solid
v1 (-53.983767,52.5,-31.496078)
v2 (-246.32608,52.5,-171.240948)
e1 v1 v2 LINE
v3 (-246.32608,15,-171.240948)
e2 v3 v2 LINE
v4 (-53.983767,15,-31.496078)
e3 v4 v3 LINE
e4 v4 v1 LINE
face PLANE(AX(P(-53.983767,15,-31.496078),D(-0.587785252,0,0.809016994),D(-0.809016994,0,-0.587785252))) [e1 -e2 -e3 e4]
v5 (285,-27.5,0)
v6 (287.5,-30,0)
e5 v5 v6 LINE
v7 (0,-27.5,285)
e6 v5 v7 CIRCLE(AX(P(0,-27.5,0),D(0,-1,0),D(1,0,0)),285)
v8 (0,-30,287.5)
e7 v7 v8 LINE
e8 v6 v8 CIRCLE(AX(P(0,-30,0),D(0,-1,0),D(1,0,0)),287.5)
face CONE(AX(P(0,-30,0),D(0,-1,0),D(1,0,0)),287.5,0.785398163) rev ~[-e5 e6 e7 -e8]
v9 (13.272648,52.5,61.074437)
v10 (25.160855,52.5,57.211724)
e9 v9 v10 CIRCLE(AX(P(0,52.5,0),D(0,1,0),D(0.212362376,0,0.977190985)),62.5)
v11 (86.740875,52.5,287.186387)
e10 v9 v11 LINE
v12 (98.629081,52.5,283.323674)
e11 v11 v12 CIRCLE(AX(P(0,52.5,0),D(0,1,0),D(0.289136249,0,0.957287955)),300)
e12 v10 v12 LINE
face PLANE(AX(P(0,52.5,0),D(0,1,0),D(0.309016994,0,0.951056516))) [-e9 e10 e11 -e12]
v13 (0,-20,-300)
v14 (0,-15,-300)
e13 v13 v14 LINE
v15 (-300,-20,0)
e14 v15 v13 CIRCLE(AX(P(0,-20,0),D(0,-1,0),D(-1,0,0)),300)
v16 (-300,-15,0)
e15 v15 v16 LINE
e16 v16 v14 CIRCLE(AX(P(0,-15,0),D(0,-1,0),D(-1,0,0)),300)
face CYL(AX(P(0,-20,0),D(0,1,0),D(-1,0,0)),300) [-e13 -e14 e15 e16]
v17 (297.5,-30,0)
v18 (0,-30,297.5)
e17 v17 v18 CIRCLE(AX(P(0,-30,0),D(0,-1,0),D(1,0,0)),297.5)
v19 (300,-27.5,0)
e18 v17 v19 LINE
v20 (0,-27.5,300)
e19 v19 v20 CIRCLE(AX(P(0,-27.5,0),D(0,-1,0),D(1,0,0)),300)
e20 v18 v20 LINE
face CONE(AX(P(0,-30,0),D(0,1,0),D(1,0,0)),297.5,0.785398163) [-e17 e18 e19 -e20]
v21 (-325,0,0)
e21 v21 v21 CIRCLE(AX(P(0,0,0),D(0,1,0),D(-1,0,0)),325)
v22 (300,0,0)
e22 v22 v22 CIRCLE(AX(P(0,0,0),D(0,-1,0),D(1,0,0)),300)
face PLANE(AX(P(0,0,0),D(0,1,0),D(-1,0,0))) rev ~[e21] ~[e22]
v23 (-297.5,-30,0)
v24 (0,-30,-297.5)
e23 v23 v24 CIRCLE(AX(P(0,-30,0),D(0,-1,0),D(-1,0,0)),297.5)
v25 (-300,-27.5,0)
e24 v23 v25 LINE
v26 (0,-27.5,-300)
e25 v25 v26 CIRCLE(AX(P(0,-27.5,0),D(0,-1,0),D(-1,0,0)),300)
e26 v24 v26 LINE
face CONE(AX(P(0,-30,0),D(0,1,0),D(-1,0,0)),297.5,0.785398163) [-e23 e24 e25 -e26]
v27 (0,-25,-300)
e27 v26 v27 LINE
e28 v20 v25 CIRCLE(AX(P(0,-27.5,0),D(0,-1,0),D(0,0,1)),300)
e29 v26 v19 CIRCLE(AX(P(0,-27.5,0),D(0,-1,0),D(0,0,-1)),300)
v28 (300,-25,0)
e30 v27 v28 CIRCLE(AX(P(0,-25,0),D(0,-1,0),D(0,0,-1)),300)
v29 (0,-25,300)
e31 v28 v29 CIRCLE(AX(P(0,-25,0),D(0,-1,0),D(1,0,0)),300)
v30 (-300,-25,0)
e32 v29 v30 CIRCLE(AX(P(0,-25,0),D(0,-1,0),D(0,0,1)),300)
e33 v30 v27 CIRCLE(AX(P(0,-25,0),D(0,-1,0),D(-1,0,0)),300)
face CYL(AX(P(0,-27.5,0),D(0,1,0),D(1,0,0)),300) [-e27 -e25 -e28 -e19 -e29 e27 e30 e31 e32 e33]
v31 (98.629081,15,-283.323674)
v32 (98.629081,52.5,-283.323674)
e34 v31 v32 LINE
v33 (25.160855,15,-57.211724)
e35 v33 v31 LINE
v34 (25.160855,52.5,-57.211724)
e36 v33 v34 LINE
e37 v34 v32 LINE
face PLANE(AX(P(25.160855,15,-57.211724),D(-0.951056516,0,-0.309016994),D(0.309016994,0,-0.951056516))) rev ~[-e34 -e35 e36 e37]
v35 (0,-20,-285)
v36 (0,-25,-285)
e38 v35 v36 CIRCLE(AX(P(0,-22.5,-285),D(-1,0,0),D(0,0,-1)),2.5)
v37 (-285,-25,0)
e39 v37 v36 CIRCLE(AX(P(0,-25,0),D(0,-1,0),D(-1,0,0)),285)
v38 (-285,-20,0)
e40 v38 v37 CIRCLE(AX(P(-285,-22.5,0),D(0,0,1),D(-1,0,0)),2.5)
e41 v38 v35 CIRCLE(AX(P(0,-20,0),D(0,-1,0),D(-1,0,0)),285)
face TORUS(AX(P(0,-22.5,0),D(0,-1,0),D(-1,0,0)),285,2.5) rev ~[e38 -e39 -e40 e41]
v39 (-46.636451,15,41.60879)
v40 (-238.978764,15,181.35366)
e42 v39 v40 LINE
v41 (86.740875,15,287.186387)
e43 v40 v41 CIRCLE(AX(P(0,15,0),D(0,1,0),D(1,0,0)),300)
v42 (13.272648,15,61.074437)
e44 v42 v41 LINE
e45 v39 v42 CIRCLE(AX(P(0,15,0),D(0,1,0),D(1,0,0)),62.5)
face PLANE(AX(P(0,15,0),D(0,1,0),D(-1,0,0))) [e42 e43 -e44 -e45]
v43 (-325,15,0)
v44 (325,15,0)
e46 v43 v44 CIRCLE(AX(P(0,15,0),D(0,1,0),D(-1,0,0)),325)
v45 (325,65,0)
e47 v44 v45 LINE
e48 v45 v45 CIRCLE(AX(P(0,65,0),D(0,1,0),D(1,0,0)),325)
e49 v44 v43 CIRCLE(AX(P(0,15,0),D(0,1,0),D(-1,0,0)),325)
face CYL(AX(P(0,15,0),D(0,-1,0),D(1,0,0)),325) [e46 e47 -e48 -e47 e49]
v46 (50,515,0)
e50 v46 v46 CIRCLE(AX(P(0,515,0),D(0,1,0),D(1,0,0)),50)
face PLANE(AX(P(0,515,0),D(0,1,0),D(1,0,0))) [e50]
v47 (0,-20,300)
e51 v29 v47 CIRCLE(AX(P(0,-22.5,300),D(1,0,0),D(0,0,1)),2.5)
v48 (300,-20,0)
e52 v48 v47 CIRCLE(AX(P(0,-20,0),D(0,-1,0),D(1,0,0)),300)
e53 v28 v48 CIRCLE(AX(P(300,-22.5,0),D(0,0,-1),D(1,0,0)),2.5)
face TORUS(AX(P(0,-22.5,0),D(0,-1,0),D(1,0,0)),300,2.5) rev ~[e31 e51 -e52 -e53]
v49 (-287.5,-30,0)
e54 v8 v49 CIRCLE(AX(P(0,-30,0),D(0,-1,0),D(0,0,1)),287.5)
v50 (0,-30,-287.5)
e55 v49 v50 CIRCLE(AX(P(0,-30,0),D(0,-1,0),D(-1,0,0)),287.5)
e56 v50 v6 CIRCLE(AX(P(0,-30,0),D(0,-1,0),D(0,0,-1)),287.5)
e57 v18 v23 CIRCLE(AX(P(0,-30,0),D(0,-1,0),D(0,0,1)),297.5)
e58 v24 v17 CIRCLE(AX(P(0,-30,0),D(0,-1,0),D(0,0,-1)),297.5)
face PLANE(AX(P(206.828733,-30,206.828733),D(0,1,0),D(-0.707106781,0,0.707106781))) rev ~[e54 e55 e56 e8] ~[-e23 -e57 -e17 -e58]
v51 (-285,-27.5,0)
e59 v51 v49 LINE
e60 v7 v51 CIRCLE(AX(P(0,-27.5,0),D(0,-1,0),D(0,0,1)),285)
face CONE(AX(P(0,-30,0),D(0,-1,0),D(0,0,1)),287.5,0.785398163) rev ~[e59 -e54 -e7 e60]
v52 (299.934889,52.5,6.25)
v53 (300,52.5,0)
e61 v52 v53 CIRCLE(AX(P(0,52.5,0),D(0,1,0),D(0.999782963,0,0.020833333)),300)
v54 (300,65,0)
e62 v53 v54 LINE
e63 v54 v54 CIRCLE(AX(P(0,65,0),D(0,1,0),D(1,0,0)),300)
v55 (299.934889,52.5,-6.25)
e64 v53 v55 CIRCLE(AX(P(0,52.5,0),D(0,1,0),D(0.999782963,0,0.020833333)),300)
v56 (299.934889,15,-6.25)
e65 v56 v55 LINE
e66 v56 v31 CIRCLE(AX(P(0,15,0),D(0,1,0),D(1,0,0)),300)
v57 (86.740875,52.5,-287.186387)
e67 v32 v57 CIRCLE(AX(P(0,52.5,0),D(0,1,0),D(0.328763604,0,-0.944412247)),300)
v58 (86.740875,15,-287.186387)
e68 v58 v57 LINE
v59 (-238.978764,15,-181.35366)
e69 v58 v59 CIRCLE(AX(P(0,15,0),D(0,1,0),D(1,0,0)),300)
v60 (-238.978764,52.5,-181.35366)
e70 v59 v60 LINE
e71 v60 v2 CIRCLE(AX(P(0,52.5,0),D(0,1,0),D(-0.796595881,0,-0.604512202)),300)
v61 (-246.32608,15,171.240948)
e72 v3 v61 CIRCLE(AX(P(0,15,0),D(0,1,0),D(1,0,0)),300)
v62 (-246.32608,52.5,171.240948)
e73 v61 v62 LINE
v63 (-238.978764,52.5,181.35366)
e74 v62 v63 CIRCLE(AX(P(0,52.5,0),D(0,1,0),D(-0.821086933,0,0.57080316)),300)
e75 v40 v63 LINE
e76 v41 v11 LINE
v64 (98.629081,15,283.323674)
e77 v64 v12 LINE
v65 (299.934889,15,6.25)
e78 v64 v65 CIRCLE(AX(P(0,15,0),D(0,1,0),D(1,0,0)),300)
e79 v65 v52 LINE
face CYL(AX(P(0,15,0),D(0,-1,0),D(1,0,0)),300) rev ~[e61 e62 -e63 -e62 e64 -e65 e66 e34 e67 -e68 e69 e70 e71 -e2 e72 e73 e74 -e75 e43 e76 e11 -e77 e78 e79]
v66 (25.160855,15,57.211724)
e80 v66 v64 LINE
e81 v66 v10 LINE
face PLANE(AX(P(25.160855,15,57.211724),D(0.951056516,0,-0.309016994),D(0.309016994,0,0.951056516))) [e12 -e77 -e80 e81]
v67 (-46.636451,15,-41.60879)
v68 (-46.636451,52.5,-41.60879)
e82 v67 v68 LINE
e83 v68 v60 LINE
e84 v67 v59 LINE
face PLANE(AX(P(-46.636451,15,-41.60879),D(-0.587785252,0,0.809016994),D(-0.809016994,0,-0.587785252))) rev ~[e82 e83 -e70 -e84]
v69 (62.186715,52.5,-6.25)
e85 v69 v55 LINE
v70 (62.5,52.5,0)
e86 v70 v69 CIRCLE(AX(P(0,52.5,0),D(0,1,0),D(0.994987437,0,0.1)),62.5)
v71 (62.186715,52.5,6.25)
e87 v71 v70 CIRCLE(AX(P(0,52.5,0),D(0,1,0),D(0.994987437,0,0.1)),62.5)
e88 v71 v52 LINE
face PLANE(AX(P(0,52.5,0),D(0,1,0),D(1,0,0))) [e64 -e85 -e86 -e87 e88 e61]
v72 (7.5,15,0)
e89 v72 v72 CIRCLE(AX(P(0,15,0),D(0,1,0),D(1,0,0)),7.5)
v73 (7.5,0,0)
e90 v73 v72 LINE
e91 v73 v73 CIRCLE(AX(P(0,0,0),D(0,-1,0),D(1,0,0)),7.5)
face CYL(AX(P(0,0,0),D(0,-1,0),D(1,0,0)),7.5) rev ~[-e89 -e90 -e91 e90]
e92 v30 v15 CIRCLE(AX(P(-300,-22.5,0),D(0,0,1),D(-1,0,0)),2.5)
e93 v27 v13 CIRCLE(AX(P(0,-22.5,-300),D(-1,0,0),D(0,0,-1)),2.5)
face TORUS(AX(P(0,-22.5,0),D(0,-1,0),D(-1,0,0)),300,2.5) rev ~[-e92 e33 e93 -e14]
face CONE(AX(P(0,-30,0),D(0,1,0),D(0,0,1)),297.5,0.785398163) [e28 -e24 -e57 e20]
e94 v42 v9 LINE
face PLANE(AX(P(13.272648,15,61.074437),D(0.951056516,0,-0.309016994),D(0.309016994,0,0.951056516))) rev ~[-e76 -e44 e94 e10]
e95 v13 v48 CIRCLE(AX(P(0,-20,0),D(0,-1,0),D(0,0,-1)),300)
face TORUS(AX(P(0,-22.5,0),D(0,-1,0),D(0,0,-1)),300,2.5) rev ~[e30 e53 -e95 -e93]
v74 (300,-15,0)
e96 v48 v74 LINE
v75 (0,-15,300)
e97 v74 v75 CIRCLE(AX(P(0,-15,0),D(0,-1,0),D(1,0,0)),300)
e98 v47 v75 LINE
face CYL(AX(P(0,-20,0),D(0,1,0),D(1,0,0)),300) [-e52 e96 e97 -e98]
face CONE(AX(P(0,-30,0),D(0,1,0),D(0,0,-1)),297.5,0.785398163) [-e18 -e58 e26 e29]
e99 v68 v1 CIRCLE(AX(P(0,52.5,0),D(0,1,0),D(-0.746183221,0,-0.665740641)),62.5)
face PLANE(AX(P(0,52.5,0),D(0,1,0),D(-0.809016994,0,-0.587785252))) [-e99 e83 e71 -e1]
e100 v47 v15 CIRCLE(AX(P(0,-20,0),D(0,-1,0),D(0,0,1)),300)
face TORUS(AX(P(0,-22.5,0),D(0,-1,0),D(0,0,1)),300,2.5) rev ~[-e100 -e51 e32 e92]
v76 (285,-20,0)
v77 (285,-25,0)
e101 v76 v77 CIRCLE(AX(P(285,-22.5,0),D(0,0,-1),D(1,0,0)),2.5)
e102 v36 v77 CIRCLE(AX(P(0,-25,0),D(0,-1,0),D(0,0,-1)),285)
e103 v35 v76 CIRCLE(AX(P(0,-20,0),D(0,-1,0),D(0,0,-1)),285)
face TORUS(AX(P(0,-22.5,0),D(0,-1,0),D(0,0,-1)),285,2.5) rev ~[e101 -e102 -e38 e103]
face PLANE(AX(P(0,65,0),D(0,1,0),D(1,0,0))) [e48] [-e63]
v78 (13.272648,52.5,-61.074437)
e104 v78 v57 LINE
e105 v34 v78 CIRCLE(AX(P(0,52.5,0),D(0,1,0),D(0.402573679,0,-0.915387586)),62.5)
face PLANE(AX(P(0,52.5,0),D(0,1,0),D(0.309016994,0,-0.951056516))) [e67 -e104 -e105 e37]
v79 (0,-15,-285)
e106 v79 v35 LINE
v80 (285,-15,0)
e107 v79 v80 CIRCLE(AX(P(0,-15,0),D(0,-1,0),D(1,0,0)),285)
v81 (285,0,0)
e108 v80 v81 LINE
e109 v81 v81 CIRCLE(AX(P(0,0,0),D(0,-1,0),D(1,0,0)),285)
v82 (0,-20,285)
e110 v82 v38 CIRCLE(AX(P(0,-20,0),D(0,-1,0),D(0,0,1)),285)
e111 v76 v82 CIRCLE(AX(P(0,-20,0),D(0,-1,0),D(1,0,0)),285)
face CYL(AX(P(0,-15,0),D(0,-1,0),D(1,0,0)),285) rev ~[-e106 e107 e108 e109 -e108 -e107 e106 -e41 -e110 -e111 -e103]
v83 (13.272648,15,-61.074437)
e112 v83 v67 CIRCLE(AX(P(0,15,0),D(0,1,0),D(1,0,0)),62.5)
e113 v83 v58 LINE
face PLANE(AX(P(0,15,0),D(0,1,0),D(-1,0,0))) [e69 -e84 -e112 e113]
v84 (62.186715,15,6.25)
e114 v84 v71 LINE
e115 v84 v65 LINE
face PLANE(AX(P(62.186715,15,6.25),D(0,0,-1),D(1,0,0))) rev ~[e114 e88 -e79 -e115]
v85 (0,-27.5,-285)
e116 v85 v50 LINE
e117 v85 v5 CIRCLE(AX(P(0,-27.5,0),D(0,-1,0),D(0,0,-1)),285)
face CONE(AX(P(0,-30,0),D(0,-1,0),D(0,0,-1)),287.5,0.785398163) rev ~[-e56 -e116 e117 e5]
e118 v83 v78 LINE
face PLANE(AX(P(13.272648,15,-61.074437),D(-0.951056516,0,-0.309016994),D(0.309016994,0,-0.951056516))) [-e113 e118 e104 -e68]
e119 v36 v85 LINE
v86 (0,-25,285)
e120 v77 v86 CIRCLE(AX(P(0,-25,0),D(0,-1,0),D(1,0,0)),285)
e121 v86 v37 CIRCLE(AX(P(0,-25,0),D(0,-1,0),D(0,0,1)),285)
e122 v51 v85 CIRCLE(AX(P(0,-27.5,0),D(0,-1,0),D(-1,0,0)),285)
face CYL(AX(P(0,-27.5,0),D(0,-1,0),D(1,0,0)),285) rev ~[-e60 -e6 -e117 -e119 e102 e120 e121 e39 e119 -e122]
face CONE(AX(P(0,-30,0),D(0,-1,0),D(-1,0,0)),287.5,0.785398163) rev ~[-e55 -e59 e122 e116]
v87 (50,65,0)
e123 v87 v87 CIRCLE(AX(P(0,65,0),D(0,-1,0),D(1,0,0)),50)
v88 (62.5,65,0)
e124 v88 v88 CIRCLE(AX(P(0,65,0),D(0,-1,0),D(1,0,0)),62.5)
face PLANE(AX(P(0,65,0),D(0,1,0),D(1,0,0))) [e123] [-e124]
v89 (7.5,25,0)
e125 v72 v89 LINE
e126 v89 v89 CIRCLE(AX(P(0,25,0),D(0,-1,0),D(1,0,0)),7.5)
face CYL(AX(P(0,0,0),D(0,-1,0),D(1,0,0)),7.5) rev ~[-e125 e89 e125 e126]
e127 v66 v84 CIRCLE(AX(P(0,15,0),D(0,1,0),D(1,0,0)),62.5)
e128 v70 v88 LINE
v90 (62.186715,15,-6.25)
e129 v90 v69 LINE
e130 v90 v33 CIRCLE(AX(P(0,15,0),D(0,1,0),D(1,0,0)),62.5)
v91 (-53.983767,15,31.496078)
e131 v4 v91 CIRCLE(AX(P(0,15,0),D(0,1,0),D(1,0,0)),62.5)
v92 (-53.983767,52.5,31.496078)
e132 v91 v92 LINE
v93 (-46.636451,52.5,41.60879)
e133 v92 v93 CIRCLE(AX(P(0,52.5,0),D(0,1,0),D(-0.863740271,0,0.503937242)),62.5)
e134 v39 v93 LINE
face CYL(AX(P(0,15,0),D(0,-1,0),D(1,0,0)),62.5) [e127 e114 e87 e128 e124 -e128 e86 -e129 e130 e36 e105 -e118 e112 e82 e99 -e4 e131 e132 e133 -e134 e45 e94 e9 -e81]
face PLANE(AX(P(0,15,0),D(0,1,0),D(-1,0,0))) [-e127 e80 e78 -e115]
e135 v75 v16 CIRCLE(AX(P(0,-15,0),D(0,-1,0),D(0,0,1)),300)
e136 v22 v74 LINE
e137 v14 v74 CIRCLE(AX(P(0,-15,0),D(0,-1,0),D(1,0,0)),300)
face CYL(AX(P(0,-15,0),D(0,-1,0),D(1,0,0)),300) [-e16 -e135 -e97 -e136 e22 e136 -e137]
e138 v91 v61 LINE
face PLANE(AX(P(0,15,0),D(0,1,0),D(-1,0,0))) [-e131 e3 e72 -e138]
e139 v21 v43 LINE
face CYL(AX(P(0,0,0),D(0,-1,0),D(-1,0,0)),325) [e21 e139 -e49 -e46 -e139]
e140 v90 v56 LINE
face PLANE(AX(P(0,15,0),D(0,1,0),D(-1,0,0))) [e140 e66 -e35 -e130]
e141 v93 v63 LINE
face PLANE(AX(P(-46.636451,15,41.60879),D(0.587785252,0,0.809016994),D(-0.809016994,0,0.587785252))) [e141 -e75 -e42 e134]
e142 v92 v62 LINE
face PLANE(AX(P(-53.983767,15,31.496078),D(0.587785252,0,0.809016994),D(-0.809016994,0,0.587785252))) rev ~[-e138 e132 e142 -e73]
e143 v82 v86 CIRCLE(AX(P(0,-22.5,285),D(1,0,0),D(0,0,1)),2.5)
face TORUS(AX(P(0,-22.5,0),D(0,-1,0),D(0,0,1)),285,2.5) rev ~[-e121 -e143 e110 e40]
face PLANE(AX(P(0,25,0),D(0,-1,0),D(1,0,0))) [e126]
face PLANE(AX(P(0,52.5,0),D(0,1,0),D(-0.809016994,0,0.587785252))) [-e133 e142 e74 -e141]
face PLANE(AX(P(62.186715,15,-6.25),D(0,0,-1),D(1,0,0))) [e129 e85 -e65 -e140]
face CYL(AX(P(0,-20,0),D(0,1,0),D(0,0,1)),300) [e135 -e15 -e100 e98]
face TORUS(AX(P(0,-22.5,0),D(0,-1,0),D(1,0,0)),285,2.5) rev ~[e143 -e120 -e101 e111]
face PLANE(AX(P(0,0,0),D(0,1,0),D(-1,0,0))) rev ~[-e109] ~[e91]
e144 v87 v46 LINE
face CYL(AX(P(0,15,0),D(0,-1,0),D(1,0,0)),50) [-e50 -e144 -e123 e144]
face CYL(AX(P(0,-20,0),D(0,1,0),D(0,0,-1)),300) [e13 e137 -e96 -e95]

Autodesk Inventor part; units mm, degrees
ref_plane "YZ Plane" through (0, 0, 0) normal (1, 0, 0) x (0, 1, 0)
ref_plane "XZ Plane" through (0, 0, 0) normal (0, 1, 0) x (-1, 0, 0)
ref_plane "XY Plane" through (0, 0, 0) normal (0, 0, 1) x (1, 0, 0)
sketch "草图1" plane through (0, 0, 0) normal (0, 1, 0) x (-1, 0, 0)
  circle A0 centre (0, 0) radius 650
  dimension "d0" = 1300
extrude "拉伸1" add sketch "草图1" along normal blind 30
sketch "草图2" plane through (0, 0, 0) normal (1, 0, 0) x (0, 1, 0)
  line L0 (0, 570) -> (-30, 570)
  line L1 (-30, 570) -> (-30, 600)
  line L2 (-30, 600) -> (0, 600)
  line L3 (0, 600) -> (0, 570)
  line L4 (0, -650) -> (0, 650) projected
  point P0 (0, 0)
  dimension "d3" = 30
  dimension "d4" = 30
  dimension "d7" = 50
sketch "草图3" plane through (0, 0, 0) normal (0, -1, 0) x (1, 0, 0)
  circle A0 centre (0, 0) radius 600
  dimension "d8" = 1200
sweep "扫掠1" add profiles "草图2" path "草图3"
sketch "草图4" plane through (0, 0, 0) normal (0, 0, 1) x (1, 0, 0)
  line L0 (-600, -30) -> (600, -30) projected
  line L1 (-570, -30) -> (570, -30) projected
  line L2 (600, -30) -> (570, -30)
  line L3 (575, -60) -> (595, -60)
  line L4 (570, -55) -> (570, -50)
  line L5 (570, -30) -> (570, -40)
  arc A0 (570, -50) -> (570, -40) centre (570, -45) ccw
  arc A1 (600, -40) -> (600, -50) centre (600, -45) ccw
  line L6 (600, -55) -> (600, -50)
  line L7 (600, -40) -> (600, -30)
  line L8 (575, -60) -> (570, -55)
  line L9 (595, -60) -> (600, -55)
  point P0 (0, 0)
  point P1 (570, -60)
  point P2 (600, -60)
  dimension "d12" = 10
  dimension "d13" = 10
  dimension "d14" = 5
  dimension "d15" = 5
  dimension "d16" = 5
  dimension "d17" = 5
  dimension "d18" = 5
sketch3d "三维草图1"
  arc A0 (570, -30, 0) -> (0, -30, 570) centre (0, -30, 0) ccw
  arc A1 (0, -30, 570) -> (-570, -30, 0) centre (0, -30, 0) ccw
  arc A2 (-570, -30, 0) -> (0, -30, -570) centre (0, -30, 0) ccw
  arc A3 (0, -30, -570) -> (570, -30, 0) centre (0, -30, 0) ccw
sweep "扫掠2" add profiles "草图4" path "三维草图1"
sketch "草图6" plane through (0, 30, 0) normal (0, 1, 0) x (1, 0, 0)
  circle A0 centre (0, 0) radius 650
  circle A1 centre (0, 0) radius 650 projected
  circle A2 centre (0, 0) radius 600
extrude "拉伸3" add sketch "草图6" along normal blind 100
sketch "草图7" plane through (0, 30, 0) normal (0, 1, 0) x (1, 0, 0)
  circle A0 centre (0, 0) radius 100
  dimension "d35" = 200
extrude "拉伸4" add sketch "草图7" along normal blind 1000
sketch "草图8" plane through (0, 0, 0) normal (0, -1, 0) x (1, 0, 0)
  circle A0 centre (0, 0) radius 15
  dimension "d38" = 30
sketch "草图9" plane through (0, 0, 0) normal (0, -1, 0) x (1, 0, 0)
  point P0 (0, 0)
extrude "拉伸5" cut sketch "草图8" against normal blind 50
scale "缩放比例1" factors (0.4, 0.4, 0.4) then translate (0, 0, 0) bodies 1
sketch "草图10" plane through (0, 12, 0) normal (0, 1, 0) x (1, 0, 0)
  circle A0 centre (0, 0) radius 6 projected
  line L0 (0, 0) -> (240, 0)
  circle A1 centre (0, 0) radius 240 projected
  line L1 (0, 0) -> (74.1641, 228.2536)
  line L2 (0, 0) -> (-194.1641, 141.0685)
  line L3 (0, 0) -> (-194.1641, -141.0685)
  line L4 (0, 0) -> (74.1641, -228.2536)
  circle A2 centre (0, 0) radius 50
  line L5 (0, -5) -> (240, -5)
  line L6 (0, 5) -> (240, 5)
  point P0 (239.9479, 5)
  point P1 (49.7494, 5)
  point P2 (49.7494, -5)
  point P3 (239.9479, -5)
  dimension "d46" = 360
  dimension "d48" = 100
  dimension "d49" = 5
  dimension "d50" = 5
extrude "拉伸6" add sketch "草图10" along normal blind 30 contours A2 L6 A1 L0 | L0 A1 L5 A2
pattern_circular "环形阵列2" count 5 over 360 about axis through (0, 12, 0) along (0, 1, 0) of "拉伸6"
extrude "拉伸7" add sketch "草图10" along normal blind 40 contours L0 A2 L5 A0 | A0 L6 A2 L0 | A0 L1 A2 L6 | L5 A2 L4 A0 | A0 L2 A2 L1 | L4 A2 L3 A0 | A0 L3 A2 L2
scale "缩放比例2" factors (1.25, 1.25, 1.25) then translate (0, 0, 0) bodies 1
equation "\"d16\" = d15"
equation "\"d17\" = d15"
equation "\"d18\" = d17"
properties part number "上导轨"
